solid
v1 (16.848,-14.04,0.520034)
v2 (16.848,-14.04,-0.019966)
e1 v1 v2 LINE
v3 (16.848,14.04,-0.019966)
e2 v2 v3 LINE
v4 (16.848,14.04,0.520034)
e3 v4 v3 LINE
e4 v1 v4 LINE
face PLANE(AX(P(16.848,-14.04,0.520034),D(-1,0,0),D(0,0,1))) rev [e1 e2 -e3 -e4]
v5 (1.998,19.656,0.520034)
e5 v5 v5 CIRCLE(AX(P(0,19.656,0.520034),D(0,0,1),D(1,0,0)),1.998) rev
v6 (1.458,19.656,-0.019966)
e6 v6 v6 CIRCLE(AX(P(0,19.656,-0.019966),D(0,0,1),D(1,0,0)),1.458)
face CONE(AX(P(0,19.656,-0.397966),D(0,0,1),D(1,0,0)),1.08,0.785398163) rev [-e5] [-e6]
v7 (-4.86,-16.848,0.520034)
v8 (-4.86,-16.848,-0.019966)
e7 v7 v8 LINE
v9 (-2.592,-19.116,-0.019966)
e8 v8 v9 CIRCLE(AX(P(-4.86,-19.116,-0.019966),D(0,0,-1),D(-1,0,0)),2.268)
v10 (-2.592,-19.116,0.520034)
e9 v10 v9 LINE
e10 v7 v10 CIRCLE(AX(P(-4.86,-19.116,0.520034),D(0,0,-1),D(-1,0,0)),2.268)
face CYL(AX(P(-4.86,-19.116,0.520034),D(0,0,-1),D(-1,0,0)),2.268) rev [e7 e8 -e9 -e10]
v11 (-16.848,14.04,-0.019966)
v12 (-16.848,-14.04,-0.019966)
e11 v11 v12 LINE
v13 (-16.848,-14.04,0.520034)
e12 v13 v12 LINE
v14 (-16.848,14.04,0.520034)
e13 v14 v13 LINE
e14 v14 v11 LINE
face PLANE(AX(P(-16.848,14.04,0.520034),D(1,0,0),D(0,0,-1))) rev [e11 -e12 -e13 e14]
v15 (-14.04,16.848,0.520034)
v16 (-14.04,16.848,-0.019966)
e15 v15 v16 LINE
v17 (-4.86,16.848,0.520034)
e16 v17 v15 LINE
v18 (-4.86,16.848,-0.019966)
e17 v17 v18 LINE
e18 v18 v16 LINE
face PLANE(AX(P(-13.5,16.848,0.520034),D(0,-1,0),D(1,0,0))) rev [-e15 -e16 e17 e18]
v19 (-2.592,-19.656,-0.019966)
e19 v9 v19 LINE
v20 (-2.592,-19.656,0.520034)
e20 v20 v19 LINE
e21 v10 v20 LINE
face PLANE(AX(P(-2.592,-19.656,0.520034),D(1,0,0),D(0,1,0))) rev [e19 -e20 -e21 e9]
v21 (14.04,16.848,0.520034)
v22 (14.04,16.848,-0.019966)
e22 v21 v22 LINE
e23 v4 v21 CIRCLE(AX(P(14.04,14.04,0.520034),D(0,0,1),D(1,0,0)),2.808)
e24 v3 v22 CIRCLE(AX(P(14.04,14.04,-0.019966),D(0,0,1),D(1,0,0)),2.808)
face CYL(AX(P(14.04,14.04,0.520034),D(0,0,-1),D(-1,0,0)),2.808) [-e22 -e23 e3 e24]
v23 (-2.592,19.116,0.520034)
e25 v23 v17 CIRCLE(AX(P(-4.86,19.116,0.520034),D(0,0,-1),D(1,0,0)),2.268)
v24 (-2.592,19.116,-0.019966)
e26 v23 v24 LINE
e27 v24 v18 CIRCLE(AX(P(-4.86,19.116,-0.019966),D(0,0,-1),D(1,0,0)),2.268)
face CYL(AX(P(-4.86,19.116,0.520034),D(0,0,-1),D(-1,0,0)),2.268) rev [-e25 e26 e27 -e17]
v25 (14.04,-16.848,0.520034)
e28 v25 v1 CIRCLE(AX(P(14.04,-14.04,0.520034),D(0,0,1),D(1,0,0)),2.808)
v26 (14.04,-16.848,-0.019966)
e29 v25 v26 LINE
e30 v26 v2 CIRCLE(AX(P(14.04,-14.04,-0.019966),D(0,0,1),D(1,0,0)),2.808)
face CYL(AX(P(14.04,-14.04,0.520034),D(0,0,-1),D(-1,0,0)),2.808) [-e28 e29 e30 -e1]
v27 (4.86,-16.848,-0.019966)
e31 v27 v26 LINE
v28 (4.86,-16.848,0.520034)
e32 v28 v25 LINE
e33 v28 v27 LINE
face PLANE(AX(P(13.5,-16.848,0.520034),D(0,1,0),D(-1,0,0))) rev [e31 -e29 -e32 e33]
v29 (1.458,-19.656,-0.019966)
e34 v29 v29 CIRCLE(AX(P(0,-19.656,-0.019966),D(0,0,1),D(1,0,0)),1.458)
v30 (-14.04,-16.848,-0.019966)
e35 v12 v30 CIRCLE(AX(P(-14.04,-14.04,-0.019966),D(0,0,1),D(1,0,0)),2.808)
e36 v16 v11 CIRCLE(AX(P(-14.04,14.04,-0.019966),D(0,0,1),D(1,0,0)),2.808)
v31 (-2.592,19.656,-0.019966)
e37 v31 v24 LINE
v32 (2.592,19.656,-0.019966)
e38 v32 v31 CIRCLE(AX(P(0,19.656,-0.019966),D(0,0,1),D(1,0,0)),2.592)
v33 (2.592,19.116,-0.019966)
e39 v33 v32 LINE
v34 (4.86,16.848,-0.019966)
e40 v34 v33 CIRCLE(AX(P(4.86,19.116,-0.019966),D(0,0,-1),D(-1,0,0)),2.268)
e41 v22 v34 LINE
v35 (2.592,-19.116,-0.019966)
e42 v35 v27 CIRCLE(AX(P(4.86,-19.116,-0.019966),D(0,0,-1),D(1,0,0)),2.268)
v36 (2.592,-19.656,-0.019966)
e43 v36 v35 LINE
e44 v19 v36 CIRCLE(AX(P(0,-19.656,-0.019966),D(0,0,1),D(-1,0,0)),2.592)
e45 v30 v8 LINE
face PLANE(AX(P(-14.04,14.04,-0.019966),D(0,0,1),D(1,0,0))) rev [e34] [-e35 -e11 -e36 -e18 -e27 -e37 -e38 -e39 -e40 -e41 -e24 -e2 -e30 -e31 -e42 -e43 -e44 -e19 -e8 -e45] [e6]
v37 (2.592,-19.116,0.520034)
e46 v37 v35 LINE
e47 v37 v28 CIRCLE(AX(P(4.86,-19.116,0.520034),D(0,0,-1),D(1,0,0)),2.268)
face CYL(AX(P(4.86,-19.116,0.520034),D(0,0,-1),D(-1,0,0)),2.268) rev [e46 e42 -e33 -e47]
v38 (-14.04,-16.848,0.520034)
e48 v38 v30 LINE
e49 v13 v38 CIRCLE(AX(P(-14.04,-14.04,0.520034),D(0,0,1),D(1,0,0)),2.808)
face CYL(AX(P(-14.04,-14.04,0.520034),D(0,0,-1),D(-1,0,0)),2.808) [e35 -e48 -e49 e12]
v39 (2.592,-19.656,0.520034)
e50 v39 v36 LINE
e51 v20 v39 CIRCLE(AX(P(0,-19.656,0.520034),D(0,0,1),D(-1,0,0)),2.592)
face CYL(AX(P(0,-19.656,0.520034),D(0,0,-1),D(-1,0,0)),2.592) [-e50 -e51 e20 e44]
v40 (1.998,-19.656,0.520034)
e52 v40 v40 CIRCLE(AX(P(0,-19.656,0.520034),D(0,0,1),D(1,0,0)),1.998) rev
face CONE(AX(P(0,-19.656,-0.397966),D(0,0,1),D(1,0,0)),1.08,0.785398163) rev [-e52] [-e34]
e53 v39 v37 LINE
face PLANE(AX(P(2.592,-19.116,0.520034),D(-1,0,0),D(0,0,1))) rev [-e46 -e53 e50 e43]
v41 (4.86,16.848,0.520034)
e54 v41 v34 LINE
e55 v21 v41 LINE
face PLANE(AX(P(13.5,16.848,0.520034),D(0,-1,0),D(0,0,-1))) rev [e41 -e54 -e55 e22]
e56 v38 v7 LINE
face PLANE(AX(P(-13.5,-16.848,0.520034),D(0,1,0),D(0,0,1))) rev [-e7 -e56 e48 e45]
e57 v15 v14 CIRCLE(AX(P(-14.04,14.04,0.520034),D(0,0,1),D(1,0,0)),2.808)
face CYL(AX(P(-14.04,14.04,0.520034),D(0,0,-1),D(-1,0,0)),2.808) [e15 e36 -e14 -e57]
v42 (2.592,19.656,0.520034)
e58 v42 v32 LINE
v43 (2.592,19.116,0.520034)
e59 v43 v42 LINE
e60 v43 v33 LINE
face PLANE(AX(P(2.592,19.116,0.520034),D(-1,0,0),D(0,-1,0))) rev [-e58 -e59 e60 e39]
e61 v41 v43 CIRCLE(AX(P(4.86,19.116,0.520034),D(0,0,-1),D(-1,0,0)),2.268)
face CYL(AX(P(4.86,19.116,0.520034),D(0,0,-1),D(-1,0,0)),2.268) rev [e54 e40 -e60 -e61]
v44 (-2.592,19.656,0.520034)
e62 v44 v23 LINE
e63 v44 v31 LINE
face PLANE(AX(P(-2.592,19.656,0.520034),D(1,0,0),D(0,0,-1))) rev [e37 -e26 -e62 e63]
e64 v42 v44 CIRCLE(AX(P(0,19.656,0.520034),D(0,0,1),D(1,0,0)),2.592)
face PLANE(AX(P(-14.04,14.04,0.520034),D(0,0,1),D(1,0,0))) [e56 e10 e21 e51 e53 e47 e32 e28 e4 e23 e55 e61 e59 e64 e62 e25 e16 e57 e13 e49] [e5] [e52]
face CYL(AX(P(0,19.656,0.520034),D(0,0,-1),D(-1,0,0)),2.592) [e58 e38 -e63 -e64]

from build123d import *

# Parameters (mm, degrees)
SKETCH_1_R      = 1
EXTRUDE_1_DEPTH = 0.5
CHAMFER_1_SIZE  = 0.85
SCALE_1_SCALE   = 1.08


with BuildPart() as part:
    # Эскиз1 → Бобышка-Вытянуть1 (new body)
    with BuildSketch(Plane.XY):
        with BuildLine():
            Line((-15.6, 13), (-15.6, -13))
            ThreePointArc((-15.6, -13), (-14.838477631, -14.838477631), (-13, -15.6))
            Line((-13, -15.6), (-12.5, -15.6))
            Line((-12.5, -15.6), (-4.5, -15.6))
            ThreePointArc((-4.5, -15.6), (-3.01507576, -16.21507576), (-2.4, -17.7))
            Line((-2.4, -17.7), (-2.4, -18.2))
            ThreePointArc((-2.4, -18.2), (0, -20.6), (2.4, -18.2))
            Line((2.4, -18.2), (2.4, -17.7))
            ThreePointArc((2.4, -17.7), (3.01507576, -16.21507576), (4.5, -15.6))
            Line((4.5, -15.6), (12.5, -15.6))
            Line((12.5, -15.6), (13, -15.6))
            ThreePointArc((13, -15.6), (14.838477631, -14.838477631), (15.6, -13))
            Line((15.6, -13), (15.6, 13))
            ThreePointArc((15.6, 13), (14.838477631, 14.838477631), (13, 15.6))
            Line((13, 15.6), (12.5, 15.6))
            Line((12.5, 15.6), (4.5, 15.6))
            ThreePointArc((4.5, 15.6), (3.01507576, 16.21507576), (2.4, 17.7))
            Line((2.4, 17.7), (2.4, 18.2))
            ThreePointArc((2.4, 18.2), (0, 20.6), (-2.4, 18.2))
            Line((-2.4, 18.2), (-2.4, 17.7))
            ThreePointArc((-2.4, 17.7), (-3.01507576, 16.21507576), (-4.5, 15.6))
            Line((-4.5, 15.6), (-12.5, 15.6))
            Line((-12.5, 15.6), (-13, 15.6))
            ThreePointArc((-13, 15.6), (-14.838477631, 14.838477631), (-15.6, 13))
        make_face()
        with Locations((0, 18.2)):
            Circle(SKETCH_1_R, mode=Mode.SUBTRACT)
        with Locations(Location((0, -18.2, 0), (0, 0, 180))):
            Circle(SKETCH_1_R, mode=Mode.SUBTRACT)
    extrude(amount=EXTRUDE_1_DEPTH)

    # Фаска1
    # the kernel refuses this chamfer: 0.85 mm, written as the material it takes off along each edge
    with BuildSketch(Plane(origin=(0, -18.2, 0.5), x_dir=(-1, 0, 0), z_dir=(0, 1, 0))) as chamfer_1_piece_1:
        Polygon((1 + CHAMFER_1_SIZE, 0), (1, -CHAMFER_1_SIZE), (1, 0), align=None)
    revolve(axis=Axis((0, -18.2, 0.5), (0, 0, 1)), mode=Mode.SUBTRACT)
    with BuildSketch(Plane(origin=(0, 18.2, 0.5), x_dir=(1, 0, 0), z_dir=(0, -1, 0))) as chamfer_1_piece_2:
        Polygon((1 + CHAMFER_1_SIZE, 0), (1, -CHAMFER_1_SIZE), (1, 0), align=None)
    revolve(axis=Axis((0, 18.2, 0.5), (0, 0, 1)), mode=Mode.SUBTRACT)


with BuildPart() as part_1:
    # Масштаб1: scaled about (0, 0, 0.249580392)
    add(part.part.scale(SCALE_1_SCALE).moved(Location((0, 0, -0.019966431))))


solid = part_1.part
